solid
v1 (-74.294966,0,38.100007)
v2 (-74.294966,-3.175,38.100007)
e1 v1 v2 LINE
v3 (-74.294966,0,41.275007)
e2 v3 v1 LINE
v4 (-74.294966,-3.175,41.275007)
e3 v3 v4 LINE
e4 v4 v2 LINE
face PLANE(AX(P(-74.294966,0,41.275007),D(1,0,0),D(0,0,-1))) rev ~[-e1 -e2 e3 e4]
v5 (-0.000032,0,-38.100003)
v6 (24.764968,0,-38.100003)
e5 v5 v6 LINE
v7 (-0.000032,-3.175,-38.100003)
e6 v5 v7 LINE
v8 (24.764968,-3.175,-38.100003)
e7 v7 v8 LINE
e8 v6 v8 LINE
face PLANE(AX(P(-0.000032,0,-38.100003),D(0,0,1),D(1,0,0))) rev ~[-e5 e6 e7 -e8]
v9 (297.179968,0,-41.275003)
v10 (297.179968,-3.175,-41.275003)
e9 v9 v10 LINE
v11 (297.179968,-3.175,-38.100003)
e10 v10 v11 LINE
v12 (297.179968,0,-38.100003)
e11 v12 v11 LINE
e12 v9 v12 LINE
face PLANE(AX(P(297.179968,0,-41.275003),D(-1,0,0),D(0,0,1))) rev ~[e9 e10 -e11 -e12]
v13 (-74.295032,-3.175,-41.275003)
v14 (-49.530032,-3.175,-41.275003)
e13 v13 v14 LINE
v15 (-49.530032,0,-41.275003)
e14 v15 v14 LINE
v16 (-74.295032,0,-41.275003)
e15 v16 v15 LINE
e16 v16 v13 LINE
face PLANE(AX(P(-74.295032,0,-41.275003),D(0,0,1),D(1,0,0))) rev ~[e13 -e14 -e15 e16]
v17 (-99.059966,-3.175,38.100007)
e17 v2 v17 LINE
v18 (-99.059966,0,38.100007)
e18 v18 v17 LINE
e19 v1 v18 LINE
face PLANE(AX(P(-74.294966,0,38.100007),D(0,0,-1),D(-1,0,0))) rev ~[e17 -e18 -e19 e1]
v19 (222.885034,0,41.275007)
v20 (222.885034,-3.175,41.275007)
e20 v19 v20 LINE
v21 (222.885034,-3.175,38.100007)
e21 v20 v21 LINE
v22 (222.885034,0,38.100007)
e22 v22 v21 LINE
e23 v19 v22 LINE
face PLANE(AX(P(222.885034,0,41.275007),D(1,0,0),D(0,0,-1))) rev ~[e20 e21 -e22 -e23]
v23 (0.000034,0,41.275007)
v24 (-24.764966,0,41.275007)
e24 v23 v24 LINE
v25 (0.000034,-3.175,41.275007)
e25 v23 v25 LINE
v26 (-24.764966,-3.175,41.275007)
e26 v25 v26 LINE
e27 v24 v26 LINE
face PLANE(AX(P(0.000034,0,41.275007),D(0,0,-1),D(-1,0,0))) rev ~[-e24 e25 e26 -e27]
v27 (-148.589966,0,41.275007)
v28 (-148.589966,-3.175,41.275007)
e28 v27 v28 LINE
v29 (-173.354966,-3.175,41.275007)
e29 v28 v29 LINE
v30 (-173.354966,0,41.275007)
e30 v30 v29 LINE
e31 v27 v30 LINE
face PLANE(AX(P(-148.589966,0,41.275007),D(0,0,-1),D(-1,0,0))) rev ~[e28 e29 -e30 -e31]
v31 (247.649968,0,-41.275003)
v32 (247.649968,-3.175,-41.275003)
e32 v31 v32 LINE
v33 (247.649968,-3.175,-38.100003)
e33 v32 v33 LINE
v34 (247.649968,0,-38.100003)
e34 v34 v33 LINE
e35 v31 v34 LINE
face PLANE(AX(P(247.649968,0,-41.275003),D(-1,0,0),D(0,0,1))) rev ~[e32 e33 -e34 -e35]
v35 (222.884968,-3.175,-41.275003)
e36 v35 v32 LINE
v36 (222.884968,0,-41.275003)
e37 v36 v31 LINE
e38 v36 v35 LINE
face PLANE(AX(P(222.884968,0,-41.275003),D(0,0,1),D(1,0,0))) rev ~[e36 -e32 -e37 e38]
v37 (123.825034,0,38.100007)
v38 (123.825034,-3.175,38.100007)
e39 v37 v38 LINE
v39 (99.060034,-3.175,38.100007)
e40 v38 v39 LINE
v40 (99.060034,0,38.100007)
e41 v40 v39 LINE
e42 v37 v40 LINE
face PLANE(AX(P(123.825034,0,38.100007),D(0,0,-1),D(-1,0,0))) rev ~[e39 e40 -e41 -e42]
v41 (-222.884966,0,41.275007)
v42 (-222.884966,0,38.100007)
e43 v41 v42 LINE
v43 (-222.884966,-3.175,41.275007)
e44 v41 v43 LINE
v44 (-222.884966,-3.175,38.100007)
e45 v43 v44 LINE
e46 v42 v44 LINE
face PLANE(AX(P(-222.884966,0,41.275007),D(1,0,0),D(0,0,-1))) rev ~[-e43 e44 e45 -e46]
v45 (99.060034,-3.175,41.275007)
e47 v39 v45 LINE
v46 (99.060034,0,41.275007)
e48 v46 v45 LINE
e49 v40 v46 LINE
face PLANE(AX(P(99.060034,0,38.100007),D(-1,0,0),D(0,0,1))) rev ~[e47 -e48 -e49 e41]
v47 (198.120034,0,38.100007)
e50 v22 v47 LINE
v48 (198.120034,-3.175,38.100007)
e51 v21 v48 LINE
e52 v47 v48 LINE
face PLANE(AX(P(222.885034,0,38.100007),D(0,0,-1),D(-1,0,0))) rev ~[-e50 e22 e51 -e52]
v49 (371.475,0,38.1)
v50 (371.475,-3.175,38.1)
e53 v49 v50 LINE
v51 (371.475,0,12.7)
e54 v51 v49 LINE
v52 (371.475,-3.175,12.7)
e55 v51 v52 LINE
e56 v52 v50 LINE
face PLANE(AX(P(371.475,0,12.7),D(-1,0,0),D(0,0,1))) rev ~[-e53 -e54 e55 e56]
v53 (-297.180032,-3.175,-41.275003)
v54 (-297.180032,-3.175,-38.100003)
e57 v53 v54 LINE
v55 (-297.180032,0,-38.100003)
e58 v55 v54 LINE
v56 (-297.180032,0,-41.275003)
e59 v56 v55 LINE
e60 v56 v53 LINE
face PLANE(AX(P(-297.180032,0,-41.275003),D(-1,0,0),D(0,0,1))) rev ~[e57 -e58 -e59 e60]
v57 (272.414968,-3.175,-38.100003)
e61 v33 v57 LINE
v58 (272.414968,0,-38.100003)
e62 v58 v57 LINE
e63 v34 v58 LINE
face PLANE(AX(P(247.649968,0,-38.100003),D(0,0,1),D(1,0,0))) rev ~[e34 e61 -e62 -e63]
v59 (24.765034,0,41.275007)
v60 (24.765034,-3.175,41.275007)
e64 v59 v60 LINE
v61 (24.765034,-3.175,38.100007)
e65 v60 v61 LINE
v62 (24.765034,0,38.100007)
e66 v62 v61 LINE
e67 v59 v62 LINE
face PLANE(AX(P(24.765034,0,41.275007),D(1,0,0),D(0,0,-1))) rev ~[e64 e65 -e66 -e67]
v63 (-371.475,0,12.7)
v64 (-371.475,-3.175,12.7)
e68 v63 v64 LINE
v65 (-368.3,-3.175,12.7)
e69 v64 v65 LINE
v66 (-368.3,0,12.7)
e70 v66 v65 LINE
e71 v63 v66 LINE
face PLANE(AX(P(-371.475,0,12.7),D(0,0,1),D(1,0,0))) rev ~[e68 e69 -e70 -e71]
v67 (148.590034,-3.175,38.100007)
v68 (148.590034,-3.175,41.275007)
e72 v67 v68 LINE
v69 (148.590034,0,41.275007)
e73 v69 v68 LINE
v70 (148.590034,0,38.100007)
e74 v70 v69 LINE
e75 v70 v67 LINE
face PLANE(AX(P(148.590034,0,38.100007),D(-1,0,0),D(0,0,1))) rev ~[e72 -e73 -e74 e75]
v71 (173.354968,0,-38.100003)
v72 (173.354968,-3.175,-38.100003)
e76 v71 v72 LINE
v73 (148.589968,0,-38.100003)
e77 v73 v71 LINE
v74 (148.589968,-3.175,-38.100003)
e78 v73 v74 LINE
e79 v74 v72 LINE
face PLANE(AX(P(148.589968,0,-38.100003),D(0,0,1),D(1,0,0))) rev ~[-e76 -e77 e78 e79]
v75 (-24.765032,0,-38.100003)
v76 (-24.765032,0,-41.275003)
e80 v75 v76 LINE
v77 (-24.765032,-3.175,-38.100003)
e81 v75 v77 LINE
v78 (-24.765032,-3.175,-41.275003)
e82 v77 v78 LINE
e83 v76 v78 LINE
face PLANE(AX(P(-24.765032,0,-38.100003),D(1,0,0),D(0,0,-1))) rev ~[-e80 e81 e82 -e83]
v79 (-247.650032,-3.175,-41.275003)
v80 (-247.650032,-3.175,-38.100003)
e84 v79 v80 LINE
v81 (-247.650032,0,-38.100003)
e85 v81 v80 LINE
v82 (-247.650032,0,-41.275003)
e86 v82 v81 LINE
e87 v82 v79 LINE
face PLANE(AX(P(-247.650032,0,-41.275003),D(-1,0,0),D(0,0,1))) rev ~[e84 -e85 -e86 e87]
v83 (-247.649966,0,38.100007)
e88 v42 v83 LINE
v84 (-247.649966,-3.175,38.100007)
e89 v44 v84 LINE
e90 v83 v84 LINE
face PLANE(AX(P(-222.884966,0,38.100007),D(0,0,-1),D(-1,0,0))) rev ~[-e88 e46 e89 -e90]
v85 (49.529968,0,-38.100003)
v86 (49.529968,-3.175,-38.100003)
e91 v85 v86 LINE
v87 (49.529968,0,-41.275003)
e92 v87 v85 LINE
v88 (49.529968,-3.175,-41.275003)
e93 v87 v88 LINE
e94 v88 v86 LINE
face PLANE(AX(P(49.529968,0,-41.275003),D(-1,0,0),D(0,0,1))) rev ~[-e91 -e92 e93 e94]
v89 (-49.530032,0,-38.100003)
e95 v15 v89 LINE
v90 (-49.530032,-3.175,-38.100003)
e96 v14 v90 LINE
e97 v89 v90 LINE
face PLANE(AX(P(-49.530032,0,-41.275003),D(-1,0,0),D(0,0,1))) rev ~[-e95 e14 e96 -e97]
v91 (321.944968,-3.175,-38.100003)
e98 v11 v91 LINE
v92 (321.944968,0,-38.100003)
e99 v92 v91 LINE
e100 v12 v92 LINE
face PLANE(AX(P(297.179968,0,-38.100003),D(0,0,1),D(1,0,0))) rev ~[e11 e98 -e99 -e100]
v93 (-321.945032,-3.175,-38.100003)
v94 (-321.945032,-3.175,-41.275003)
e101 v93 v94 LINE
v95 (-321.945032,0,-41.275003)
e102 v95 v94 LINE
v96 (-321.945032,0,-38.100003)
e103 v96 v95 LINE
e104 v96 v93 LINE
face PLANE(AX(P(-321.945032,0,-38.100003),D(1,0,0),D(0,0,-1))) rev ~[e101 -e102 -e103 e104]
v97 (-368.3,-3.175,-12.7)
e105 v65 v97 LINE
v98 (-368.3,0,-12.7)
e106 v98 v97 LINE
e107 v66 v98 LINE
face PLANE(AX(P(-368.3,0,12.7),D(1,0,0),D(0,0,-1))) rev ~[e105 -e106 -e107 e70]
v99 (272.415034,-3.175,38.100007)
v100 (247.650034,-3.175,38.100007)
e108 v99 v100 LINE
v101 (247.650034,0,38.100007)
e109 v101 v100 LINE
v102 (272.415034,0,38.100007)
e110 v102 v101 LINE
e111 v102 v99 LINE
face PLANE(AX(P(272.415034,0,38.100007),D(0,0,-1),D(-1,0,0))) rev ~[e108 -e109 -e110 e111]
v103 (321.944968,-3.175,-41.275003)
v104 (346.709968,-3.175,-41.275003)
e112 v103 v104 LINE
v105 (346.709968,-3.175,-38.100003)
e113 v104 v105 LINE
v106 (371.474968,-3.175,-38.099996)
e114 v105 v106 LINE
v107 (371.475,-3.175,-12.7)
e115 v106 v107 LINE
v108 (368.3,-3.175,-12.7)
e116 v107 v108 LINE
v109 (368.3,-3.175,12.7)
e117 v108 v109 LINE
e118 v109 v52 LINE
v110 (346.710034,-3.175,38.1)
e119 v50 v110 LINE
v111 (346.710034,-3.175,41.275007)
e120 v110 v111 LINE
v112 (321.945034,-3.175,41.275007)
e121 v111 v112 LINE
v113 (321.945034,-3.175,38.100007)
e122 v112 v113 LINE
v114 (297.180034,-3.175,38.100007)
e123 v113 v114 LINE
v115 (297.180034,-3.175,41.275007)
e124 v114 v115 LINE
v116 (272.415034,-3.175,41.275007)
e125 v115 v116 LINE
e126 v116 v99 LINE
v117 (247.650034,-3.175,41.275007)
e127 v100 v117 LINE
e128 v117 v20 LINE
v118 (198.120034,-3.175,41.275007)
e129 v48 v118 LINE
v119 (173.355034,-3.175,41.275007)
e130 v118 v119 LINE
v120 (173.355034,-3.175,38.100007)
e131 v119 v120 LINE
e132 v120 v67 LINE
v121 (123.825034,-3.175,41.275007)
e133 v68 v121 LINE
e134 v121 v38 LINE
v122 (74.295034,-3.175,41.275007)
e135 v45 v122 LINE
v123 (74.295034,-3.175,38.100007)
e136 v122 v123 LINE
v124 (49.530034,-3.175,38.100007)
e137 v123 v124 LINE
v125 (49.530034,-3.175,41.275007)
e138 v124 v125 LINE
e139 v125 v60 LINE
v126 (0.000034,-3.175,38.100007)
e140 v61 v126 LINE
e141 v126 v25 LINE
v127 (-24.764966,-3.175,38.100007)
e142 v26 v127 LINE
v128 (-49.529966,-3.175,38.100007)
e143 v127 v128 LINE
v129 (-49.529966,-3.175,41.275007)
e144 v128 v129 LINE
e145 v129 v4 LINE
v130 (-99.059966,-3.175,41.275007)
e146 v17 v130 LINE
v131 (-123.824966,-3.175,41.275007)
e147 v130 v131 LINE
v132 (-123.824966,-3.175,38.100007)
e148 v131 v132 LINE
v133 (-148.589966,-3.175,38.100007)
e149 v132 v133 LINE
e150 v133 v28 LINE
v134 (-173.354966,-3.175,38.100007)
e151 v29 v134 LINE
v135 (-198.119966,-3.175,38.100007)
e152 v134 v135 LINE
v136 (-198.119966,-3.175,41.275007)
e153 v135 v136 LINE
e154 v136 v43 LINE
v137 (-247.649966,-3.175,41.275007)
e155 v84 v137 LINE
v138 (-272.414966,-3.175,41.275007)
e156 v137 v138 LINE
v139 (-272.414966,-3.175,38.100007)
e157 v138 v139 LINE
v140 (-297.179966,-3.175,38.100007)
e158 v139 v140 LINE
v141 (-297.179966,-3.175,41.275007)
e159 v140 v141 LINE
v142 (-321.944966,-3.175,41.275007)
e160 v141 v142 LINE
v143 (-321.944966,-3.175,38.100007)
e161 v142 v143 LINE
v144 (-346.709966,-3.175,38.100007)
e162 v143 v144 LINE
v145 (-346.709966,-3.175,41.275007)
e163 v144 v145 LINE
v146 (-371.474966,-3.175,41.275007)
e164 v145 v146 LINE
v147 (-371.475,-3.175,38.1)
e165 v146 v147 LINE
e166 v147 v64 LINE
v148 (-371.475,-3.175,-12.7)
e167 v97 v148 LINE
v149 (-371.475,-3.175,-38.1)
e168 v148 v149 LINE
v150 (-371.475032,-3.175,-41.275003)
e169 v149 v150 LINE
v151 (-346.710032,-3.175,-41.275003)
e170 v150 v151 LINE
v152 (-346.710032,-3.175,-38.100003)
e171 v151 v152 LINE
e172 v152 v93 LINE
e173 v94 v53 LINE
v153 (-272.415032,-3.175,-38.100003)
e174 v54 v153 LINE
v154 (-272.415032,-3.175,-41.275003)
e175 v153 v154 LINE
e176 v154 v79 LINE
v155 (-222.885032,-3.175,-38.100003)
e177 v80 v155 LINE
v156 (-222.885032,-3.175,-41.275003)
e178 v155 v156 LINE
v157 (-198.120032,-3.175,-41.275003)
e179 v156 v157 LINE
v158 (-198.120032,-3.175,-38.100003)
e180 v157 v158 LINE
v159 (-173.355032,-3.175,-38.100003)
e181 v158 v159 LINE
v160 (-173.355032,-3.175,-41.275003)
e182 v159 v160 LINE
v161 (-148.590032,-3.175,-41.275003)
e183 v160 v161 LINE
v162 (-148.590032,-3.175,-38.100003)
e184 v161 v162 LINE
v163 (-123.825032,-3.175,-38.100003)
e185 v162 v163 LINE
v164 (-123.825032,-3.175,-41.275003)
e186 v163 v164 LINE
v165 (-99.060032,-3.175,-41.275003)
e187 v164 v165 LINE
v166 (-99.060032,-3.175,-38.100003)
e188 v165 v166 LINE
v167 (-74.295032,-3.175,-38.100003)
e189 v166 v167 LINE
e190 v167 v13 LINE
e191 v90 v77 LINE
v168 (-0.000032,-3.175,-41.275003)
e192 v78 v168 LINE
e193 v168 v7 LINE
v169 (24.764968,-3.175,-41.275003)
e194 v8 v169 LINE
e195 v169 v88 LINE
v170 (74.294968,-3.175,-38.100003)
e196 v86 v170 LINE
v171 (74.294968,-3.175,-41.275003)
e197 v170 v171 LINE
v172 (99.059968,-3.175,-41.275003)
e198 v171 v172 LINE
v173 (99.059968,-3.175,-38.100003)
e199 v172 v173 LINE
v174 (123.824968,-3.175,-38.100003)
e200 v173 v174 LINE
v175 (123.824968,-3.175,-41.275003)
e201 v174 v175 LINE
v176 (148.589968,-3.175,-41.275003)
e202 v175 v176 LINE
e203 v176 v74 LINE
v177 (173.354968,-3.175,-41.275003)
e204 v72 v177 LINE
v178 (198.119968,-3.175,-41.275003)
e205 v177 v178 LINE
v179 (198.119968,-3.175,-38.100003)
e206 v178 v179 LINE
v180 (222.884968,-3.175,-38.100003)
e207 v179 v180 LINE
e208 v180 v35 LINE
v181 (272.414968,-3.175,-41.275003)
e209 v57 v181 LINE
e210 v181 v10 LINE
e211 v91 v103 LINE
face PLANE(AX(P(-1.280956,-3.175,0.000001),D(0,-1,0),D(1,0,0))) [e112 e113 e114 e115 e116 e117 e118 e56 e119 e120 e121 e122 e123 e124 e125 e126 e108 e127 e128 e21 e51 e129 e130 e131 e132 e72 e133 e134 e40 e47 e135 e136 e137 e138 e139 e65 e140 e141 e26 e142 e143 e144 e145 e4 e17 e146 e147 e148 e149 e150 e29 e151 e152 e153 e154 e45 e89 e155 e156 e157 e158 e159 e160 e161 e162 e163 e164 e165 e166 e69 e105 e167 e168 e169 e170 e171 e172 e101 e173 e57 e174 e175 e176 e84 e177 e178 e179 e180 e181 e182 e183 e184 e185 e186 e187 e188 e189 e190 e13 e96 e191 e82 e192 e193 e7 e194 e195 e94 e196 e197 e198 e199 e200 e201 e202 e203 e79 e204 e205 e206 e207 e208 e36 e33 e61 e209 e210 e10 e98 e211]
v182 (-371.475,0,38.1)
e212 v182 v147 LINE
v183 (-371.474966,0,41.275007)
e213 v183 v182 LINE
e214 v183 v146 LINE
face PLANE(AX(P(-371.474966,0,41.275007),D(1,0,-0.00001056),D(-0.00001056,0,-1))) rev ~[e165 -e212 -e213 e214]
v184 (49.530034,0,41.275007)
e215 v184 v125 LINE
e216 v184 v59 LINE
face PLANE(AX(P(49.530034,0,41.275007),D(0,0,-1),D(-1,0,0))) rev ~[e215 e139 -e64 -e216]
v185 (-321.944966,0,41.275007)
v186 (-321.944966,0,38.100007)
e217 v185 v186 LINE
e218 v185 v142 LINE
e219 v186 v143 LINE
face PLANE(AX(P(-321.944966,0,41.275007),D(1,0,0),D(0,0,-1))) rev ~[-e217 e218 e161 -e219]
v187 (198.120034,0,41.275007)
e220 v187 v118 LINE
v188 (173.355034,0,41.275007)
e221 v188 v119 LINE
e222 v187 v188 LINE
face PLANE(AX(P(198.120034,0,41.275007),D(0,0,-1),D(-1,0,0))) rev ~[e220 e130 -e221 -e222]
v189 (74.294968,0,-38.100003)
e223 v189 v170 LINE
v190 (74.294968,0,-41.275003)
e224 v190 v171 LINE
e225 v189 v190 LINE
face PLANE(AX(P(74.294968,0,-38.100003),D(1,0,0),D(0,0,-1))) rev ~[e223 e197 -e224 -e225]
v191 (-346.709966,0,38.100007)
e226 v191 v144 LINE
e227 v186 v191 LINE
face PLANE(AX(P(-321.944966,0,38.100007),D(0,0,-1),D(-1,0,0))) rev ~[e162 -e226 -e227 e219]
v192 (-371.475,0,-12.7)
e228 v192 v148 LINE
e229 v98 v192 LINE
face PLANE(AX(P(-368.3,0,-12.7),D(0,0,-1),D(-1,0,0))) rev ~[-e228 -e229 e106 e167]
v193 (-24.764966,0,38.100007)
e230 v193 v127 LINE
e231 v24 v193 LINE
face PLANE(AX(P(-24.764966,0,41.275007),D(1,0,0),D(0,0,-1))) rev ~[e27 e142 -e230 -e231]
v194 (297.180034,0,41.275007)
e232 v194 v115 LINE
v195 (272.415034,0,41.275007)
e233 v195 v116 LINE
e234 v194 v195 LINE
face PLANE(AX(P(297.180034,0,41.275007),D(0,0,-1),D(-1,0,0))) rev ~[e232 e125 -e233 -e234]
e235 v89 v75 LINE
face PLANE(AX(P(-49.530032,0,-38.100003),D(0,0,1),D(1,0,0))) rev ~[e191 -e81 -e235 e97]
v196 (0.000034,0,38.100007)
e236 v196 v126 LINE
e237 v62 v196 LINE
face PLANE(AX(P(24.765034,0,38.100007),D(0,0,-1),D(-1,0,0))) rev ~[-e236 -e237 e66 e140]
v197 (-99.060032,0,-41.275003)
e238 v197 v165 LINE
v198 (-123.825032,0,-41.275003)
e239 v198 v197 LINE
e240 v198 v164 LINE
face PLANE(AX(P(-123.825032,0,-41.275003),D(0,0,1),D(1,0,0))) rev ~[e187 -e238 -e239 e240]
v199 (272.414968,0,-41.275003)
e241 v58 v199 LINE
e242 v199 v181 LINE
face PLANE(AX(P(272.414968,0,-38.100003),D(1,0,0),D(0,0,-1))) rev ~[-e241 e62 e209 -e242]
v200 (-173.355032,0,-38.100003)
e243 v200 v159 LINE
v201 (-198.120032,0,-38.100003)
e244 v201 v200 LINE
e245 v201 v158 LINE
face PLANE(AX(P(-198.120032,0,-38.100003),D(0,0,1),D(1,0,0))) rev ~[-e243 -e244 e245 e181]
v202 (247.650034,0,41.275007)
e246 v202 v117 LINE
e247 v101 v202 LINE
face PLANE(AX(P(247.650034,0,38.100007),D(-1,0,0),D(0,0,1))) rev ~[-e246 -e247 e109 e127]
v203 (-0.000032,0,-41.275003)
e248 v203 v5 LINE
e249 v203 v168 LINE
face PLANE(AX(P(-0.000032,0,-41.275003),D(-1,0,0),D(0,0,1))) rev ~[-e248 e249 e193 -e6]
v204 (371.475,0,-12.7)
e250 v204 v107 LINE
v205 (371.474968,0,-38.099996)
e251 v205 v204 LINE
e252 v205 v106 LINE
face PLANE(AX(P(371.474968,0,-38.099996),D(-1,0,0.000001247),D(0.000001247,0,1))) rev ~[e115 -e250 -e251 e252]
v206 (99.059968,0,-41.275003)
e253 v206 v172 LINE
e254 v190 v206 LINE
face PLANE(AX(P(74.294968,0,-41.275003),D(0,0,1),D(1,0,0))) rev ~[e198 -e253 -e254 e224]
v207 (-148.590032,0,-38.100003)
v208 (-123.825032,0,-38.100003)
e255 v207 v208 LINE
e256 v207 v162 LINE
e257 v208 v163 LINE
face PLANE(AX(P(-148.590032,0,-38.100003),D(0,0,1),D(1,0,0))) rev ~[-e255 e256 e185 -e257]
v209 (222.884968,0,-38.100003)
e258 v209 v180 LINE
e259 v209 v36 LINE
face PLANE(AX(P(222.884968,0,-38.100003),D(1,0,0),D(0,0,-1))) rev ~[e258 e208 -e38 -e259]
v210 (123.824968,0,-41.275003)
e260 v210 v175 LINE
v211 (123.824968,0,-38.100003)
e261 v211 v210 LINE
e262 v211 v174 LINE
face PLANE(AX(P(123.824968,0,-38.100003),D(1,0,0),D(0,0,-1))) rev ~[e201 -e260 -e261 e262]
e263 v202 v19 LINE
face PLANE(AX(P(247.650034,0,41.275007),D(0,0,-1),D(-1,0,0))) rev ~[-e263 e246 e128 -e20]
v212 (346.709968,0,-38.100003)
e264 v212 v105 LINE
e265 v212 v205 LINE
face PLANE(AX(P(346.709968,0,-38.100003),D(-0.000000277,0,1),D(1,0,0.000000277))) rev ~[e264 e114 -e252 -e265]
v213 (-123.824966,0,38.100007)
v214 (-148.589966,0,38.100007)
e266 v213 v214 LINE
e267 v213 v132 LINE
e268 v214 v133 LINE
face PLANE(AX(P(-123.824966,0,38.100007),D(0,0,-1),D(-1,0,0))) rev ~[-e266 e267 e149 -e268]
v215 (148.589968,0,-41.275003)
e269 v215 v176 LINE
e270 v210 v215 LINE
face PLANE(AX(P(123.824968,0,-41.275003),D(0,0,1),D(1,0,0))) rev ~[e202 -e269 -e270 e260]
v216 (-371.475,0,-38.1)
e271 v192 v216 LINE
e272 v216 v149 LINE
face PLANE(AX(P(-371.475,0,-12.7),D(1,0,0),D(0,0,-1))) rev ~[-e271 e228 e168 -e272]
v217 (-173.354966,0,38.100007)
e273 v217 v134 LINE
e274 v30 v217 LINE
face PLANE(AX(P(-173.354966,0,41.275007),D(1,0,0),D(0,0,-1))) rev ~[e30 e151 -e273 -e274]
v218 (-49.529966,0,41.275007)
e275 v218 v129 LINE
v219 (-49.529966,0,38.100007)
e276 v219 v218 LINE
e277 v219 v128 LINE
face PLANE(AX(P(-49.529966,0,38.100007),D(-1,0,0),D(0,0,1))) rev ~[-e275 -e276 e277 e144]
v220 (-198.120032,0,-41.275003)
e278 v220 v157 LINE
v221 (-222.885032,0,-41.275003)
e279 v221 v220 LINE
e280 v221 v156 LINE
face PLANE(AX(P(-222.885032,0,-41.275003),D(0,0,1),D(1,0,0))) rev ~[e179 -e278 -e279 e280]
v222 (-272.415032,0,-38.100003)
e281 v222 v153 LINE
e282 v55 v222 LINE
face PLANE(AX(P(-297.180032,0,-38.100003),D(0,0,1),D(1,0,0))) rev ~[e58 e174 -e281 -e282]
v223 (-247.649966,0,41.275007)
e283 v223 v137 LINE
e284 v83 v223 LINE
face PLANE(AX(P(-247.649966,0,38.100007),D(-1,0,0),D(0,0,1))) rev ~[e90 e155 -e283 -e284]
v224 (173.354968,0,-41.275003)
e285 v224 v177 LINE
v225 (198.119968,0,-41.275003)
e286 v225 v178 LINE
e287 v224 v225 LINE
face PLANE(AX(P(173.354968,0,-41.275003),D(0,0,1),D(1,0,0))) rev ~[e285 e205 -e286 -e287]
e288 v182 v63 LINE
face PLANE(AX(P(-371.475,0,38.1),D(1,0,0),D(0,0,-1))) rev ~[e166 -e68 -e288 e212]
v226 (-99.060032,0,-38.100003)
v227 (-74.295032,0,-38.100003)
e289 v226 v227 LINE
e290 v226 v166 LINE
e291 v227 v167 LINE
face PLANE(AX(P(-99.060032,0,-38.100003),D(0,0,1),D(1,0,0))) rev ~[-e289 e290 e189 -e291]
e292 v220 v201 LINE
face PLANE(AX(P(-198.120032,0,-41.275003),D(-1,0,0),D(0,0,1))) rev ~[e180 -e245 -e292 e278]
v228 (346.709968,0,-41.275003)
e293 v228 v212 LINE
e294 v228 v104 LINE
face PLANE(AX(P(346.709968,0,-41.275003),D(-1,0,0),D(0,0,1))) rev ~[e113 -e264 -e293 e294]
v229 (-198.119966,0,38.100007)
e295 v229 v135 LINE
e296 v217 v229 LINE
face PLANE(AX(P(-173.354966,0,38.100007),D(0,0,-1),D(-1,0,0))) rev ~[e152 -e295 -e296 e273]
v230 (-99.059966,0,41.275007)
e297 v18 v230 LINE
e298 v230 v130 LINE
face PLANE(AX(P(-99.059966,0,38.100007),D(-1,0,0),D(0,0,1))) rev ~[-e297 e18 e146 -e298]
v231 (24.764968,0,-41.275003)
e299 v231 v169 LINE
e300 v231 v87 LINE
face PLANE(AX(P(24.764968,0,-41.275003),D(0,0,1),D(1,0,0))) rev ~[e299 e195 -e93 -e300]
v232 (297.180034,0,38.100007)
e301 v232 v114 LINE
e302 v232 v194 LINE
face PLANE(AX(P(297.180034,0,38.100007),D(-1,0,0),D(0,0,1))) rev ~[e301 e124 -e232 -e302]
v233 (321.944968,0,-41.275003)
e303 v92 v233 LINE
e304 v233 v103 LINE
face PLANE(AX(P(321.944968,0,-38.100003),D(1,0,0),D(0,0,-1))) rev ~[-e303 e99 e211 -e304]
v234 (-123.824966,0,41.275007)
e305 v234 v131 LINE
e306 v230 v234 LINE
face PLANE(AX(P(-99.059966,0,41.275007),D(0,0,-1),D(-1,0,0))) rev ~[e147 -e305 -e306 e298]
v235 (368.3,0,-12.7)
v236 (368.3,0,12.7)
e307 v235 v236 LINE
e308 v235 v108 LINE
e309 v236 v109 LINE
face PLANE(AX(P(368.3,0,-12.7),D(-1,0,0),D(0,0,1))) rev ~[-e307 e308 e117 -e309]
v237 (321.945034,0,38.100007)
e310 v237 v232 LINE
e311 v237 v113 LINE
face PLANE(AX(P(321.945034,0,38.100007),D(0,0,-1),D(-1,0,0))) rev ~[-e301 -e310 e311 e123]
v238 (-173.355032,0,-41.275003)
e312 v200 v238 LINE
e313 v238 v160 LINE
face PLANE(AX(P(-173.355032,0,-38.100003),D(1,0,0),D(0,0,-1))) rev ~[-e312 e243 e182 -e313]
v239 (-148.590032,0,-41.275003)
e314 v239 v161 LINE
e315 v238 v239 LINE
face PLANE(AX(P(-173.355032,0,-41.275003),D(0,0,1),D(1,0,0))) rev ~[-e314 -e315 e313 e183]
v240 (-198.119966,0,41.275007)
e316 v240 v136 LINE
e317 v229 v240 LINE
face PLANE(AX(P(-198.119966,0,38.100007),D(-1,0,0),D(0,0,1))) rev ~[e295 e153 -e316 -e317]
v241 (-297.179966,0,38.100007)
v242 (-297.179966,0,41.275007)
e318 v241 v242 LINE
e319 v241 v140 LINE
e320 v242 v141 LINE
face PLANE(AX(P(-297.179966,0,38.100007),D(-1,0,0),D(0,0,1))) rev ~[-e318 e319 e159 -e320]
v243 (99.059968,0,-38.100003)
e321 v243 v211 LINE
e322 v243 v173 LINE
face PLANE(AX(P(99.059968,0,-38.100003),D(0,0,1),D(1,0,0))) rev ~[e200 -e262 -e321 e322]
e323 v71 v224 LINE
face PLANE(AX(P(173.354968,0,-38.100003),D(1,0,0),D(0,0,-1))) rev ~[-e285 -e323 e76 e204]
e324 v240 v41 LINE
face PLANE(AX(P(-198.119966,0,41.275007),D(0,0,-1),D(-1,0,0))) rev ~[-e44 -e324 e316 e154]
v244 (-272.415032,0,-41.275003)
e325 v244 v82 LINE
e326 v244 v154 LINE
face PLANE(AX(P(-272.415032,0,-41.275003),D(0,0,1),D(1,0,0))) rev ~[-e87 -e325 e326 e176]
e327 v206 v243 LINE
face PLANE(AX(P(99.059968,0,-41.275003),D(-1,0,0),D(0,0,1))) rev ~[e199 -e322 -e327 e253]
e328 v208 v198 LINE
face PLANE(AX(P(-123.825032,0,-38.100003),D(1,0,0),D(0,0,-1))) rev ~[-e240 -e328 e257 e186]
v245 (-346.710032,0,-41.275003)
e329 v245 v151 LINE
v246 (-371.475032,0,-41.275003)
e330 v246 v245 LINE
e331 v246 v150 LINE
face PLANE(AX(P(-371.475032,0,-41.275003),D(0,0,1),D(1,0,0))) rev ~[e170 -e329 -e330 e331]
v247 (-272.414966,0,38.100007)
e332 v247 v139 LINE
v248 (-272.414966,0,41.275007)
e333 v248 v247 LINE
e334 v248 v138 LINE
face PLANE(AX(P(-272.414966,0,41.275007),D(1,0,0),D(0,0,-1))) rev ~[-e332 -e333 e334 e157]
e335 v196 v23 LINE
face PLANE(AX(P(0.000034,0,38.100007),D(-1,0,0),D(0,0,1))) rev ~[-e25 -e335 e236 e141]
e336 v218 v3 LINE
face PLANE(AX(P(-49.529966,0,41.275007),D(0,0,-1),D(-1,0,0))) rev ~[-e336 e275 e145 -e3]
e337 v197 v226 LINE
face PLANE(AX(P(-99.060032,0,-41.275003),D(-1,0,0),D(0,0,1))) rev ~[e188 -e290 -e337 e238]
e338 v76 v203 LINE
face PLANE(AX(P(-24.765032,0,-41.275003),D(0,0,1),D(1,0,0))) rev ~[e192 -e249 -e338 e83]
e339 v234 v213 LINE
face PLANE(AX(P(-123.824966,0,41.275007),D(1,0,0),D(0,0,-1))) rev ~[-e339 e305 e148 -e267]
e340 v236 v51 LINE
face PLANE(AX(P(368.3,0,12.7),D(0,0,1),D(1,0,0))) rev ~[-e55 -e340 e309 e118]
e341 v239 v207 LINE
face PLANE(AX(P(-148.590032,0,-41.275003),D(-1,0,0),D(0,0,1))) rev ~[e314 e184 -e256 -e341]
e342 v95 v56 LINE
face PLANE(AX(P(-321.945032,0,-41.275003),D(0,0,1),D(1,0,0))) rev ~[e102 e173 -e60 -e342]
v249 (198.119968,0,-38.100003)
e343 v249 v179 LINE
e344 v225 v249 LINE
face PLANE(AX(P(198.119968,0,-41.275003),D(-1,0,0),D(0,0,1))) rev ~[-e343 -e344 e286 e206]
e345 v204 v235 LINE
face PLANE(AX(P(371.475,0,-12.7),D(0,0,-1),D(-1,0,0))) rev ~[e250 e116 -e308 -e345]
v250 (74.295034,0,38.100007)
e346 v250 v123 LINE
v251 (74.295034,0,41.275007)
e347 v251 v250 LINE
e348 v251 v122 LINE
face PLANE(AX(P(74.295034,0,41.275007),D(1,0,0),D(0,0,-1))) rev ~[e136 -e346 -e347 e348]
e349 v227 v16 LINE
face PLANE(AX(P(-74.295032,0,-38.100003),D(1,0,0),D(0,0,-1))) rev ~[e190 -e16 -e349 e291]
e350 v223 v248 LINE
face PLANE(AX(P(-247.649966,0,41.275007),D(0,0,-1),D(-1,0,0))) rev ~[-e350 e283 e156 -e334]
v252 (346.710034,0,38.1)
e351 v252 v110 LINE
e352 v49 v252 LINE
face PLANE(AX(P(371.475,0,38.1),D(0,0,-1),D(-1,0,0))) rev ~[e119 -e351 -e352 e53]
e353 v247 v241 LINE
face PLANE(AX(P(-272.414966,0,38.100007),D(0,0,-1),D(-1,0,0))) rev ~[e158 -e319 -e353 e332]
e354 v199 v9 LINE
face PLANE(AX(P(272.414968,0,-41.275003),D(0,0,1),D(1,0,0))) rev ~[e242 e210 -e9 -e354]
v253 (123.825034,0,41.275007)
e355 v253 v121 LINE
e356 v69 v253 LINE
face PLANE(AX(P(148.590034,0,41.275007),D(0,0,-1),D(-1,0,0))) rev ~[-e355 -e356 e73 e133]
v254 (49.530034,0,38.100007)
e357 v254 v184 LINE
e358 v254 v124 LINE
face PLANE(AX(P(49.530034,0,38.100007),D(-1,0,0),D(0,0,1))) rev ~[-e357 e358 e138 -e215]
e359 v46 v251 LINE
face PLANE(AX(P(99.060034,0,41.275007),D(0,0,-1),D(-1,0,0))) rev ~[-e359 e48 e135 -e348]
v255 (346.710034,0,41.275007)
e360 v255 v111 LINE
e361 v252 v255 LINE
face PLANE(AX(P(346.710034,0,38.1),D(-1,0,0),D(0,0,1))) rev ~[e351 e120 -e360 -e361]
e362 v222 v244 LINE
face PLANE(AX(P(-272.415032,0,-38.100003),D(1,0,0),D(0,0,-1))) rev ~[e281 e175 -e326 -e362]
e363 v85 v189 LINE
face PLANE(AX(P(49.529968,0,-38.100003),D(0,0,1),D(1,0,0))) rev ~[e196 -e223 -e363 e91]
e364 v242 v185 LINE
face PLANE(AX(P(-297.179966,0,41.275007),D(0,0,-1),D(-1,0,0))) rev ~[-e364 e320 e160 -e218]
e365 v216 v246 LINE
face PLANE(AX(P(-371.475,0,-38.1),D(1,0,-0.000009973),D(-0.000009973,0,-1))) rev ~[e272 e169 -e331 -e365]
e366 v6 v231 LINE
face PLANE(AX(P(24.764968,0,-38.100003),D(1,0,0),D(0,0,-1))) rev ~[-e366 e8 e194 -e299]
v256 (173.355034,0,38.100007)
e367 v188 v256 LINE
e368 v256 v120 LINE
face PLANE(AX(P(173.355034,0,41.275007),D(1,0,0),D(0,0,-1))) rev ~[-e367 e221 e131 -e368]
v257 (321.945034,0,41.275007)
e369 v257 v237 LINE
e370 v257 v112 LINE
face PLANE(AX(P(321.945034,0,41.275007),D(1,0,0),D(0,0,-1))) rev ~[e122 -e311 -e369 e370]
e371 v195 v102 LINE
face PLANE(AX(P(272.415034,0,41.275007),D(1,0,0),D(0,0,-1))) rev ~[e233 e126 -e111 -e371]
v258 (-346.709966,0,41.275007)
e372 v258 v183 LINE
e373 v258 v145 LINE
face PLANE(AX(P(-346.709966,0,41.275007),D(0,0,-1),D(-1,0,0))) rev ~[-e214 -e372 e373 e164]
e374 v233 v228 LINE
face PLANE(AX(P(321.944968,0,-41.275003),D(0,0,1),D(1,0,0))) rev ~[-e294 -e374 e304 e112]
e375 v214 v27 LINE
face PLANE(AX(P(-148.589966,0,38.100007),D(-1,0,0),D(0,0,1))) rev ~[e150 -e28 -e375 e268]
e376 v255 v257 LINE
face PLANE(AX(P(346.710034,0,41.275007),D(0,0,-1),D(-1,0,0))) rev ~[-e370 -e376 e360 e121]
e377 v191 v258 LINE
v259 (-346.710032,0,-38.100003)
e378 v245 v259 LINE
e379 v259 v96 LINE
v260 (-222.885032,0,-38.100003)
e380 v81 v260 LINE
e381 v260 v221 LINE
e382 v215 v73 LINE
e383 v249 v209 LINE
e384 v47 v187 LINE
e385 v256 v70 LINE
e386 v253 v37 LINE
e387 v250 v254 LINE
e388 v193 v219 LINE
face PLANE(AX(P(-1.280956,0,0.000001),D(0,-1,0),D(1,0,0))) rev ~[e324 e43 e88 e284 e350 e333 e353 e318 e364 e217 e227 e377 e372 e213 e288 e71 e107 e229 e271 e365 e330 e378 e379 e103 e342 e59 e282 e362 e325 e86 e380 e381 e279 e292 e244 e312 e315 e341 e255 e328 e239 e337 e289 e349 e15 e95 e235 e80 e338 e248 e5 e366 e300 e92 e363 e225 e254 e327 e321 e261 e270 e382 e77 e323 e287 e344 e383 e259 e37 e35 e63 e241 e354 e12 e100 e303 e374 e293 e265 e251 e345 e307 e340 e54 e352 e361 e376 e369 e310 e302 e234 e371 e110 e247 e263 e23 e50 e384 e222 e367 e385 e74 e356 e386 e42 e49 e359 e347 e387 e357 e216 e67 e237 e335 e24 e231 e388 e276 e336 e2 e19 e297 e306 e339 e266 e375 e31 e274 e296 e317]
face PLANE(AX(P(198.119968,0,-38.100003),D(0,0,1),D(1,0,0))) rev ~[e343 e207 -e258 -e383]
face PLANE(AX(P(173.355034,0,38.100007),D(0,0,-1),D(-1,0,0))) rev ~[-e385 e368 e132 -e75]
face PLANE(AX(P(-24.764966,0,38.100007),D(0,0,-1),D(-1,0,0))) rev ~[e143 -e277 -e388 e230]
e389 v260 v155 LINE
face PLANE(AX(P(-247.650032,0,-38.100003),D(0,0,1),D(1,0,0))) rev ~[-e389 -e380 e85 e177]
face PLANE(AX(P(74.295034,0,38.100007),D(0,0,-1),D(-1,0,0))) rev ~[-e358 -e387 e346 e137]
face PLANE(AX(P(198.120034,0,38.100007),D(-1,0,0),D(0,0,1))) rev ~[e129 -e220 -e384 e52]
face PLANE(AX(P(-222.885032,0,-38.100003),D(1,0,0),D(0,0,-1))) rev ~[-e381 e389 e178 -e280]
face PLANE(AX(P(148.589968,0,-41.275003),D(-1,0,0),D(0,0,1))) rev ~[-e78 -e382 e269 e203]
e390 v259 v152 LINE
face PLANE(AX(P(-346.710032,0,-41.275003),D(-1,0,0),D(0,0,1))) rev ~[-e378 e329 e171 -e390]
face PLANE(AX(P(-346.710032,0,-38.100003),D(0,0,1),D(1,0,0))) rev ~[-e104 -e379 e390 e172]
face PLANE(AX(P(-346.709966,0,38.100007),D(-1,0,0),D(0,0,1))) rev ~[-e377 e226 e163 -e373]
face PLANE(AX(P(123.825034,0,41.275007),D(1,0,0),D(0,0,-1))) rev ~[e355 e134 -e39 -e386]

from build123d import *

# Parameters (mm, degrees)
F1_DEPTH = 3.175


# Not quite as in the source:
# - ends of sketch curves that miss each other by under 0.0002 mm in the source are joined


with BuildPart() as f1:
    # F0 (on Front) → F1 (new body)
    with BuildSketch(Plane.XZ):
        Polygon((148.5900335276, 41.2750068545), (123.8250335276, 41.2750068545), (123.8250335276, 38.1000068545), (99.0600335276, 38.1000068545), (99.0600335276, 41.2750068545), (74.2950335276, 41.2750068545), (74.2950335276, 38.1000068545), (49.5300335276, 38.1000068545), (49.5300335276, 41.2750068545), (24.7650335276, 41.2750068545), (24.7650335276, 38.1000068545), (3.35276e-05, 38.1000068545), (3.35276e-05, 41.2750068545), (-24.7649664724, 41.2750068545), (-24.7649664724, 38.1000068545), (-49.5299664724, 38.1000068545), (-49.5299664724, 41.2750068545), (-74.2949664724, 41.2750068545), (-74.2949664724, 38.1000068545), (-99.0599664724, 38.1000068545), (-99.0599664724, 41.2750068545), (-123.8249664724, 41.2750068545), (-123.8249664724, 38.1000068545), (-148.5899664724, 38.1000068545), (-148.5899664724, 41.2750068545), (-173.3549664724, 41.2750068545), (-173.3549664724, 38.1000068545), (-198.1199664724, 38.1000068545), (-198.1199664724, 41.2750068545), (-222.8849664724, 41.2750068545), (-222.8849664724, 38.1000068545), (-247.6499664724, 38.1000068545), (-247.6499664724, 41.2750068545), (-272.4149664724, 41.2750068545), (-272.4149664724, 38.1000068545), (-297.1799664724, 38.1000068545), (-297.1799664724, 41.2750068545), (-321.9449664724, 41.2750068545), (-321.9449664724, 38.1000068545), (-346.7099664724, 38.1000068545), (-346.7099664724, 41.2750068545), (-371.4749664724, 41.2750068545), (-371.475, 38.1), (-371.475, 12.7), (-368.3, 12.7), (-368.3, -12.7), (-371.475, -12.7), (-371.475, -38.1), (-371.475031665, -41.2750032454), (-346.710031665, -41.2750032454), (-346.710031665, -38.1000032454), (-321.945031665, -38.1000032454), (-321.945031665, -41.2750032454), (-297.180031665, -41.2750032454), (-297.180031665, -38.1000032454), (-272.415031665, -38.1000032454), (-272.415031665, -41.2750032454), (-247.650031665, -41.2750032454), (-247.650031665, -38.1000032454), (-222.885031665, -38.1000032454), (-222.885031665, -41.2750032454), (-198.120031665, -41.2750032454), (-198.120031665, -38.1000032454), (-173.355031665, -38.1000032454), (-173.355031665, -41.2750032454), (-148.590031665, -41.2750032454), (-148.590031665, -38.1000032454), (-123.825031665, -38.1000032454), (-123.825031665, -41.2750032454), (-99.060031665, -41.2750032454), (-99.060031665, -38.1000032454), (-74.295031665, -38.1000032454), (-74.295031665, -41.2750032454), (-49.530031665, -41.2750032454), (-49.530031665, -38.1000032454), (-24.765031665, -38.1000032454), (-24.765031665, -41.2750032454), (-3.1665e-05, -41.2750032454), (-3.1665e-05, -38.1000032454), (24.764968335, -38.1000032454), (24.764968335, -41.2750032454), (49.529968335, -41.2750032454), (49.529968335, -38.1000032454), (74.294968335, -38.1000032454), (74.294968335, -41.2750032454), (92.075, -41.2750032454), (99.059968335, -41.2750032454), (99.059968335, -38.1000032454), (123.824968335, -38.1000032454), (123.824968335, -41.2750032454), (148.589968335, -41.2750032454), (148.589968335, -38.1000032454), (173.354968335, -38.1000032454), (173.354968335, -41.2750032454), (198.119968335, -41.2750032454), (198.119968335, -38.1000032454), (222.884968335, -38.1000032454), (222.884968335, -41.2750032454), (244.475, -41.2750032454), (247.649968335, -41.2750032454), (247.649968335, -38.1000032454), (272.414968335, -38.1000032454), (272.414968335, -41.2750032454), (297.179968335, -41.2750032454), (297.179968335, -38.1000032454), (321.944968335, -38.1000032454), (321.944968335, -41.2750032454), (346.709968335, -41.2750032453), (346.709968335, -38.1000032454), (371.474968335, -38.0999963909), (371.475, -12.7), (368.3, -12.7), (368.3, 12.7), (371.475, 12.7), (371.475, 38.1), (368.3, 38.1), (346.7100335276, 38.1), (346.7100335276, 41.2750068545), (321.9450335276, 41.2750068544), (321.9450335276, 38.1000068545), (297.1800335276, 38.1000068545), (297.1800335276, 41.2750068545), (272.4150335276, 41.2750068545), (272.4150335276, 38.1000068545), (247.6500335276, 38.1000068545), (247.6500335276, 41.2750068545), (222.8850335276, 41.2750068545), (222.8850335276, 38.1000068545), (198.1200335276, 38.1000068545), (198.1200335276, 41.2750068545), (173.3550335276, 41.2750068545), (173.3550335276, 38.1000068545), (148.5900335276, 38.1000068545), align=None)
    extrude(amount=F1_DEPTH)


solid = f1.part
